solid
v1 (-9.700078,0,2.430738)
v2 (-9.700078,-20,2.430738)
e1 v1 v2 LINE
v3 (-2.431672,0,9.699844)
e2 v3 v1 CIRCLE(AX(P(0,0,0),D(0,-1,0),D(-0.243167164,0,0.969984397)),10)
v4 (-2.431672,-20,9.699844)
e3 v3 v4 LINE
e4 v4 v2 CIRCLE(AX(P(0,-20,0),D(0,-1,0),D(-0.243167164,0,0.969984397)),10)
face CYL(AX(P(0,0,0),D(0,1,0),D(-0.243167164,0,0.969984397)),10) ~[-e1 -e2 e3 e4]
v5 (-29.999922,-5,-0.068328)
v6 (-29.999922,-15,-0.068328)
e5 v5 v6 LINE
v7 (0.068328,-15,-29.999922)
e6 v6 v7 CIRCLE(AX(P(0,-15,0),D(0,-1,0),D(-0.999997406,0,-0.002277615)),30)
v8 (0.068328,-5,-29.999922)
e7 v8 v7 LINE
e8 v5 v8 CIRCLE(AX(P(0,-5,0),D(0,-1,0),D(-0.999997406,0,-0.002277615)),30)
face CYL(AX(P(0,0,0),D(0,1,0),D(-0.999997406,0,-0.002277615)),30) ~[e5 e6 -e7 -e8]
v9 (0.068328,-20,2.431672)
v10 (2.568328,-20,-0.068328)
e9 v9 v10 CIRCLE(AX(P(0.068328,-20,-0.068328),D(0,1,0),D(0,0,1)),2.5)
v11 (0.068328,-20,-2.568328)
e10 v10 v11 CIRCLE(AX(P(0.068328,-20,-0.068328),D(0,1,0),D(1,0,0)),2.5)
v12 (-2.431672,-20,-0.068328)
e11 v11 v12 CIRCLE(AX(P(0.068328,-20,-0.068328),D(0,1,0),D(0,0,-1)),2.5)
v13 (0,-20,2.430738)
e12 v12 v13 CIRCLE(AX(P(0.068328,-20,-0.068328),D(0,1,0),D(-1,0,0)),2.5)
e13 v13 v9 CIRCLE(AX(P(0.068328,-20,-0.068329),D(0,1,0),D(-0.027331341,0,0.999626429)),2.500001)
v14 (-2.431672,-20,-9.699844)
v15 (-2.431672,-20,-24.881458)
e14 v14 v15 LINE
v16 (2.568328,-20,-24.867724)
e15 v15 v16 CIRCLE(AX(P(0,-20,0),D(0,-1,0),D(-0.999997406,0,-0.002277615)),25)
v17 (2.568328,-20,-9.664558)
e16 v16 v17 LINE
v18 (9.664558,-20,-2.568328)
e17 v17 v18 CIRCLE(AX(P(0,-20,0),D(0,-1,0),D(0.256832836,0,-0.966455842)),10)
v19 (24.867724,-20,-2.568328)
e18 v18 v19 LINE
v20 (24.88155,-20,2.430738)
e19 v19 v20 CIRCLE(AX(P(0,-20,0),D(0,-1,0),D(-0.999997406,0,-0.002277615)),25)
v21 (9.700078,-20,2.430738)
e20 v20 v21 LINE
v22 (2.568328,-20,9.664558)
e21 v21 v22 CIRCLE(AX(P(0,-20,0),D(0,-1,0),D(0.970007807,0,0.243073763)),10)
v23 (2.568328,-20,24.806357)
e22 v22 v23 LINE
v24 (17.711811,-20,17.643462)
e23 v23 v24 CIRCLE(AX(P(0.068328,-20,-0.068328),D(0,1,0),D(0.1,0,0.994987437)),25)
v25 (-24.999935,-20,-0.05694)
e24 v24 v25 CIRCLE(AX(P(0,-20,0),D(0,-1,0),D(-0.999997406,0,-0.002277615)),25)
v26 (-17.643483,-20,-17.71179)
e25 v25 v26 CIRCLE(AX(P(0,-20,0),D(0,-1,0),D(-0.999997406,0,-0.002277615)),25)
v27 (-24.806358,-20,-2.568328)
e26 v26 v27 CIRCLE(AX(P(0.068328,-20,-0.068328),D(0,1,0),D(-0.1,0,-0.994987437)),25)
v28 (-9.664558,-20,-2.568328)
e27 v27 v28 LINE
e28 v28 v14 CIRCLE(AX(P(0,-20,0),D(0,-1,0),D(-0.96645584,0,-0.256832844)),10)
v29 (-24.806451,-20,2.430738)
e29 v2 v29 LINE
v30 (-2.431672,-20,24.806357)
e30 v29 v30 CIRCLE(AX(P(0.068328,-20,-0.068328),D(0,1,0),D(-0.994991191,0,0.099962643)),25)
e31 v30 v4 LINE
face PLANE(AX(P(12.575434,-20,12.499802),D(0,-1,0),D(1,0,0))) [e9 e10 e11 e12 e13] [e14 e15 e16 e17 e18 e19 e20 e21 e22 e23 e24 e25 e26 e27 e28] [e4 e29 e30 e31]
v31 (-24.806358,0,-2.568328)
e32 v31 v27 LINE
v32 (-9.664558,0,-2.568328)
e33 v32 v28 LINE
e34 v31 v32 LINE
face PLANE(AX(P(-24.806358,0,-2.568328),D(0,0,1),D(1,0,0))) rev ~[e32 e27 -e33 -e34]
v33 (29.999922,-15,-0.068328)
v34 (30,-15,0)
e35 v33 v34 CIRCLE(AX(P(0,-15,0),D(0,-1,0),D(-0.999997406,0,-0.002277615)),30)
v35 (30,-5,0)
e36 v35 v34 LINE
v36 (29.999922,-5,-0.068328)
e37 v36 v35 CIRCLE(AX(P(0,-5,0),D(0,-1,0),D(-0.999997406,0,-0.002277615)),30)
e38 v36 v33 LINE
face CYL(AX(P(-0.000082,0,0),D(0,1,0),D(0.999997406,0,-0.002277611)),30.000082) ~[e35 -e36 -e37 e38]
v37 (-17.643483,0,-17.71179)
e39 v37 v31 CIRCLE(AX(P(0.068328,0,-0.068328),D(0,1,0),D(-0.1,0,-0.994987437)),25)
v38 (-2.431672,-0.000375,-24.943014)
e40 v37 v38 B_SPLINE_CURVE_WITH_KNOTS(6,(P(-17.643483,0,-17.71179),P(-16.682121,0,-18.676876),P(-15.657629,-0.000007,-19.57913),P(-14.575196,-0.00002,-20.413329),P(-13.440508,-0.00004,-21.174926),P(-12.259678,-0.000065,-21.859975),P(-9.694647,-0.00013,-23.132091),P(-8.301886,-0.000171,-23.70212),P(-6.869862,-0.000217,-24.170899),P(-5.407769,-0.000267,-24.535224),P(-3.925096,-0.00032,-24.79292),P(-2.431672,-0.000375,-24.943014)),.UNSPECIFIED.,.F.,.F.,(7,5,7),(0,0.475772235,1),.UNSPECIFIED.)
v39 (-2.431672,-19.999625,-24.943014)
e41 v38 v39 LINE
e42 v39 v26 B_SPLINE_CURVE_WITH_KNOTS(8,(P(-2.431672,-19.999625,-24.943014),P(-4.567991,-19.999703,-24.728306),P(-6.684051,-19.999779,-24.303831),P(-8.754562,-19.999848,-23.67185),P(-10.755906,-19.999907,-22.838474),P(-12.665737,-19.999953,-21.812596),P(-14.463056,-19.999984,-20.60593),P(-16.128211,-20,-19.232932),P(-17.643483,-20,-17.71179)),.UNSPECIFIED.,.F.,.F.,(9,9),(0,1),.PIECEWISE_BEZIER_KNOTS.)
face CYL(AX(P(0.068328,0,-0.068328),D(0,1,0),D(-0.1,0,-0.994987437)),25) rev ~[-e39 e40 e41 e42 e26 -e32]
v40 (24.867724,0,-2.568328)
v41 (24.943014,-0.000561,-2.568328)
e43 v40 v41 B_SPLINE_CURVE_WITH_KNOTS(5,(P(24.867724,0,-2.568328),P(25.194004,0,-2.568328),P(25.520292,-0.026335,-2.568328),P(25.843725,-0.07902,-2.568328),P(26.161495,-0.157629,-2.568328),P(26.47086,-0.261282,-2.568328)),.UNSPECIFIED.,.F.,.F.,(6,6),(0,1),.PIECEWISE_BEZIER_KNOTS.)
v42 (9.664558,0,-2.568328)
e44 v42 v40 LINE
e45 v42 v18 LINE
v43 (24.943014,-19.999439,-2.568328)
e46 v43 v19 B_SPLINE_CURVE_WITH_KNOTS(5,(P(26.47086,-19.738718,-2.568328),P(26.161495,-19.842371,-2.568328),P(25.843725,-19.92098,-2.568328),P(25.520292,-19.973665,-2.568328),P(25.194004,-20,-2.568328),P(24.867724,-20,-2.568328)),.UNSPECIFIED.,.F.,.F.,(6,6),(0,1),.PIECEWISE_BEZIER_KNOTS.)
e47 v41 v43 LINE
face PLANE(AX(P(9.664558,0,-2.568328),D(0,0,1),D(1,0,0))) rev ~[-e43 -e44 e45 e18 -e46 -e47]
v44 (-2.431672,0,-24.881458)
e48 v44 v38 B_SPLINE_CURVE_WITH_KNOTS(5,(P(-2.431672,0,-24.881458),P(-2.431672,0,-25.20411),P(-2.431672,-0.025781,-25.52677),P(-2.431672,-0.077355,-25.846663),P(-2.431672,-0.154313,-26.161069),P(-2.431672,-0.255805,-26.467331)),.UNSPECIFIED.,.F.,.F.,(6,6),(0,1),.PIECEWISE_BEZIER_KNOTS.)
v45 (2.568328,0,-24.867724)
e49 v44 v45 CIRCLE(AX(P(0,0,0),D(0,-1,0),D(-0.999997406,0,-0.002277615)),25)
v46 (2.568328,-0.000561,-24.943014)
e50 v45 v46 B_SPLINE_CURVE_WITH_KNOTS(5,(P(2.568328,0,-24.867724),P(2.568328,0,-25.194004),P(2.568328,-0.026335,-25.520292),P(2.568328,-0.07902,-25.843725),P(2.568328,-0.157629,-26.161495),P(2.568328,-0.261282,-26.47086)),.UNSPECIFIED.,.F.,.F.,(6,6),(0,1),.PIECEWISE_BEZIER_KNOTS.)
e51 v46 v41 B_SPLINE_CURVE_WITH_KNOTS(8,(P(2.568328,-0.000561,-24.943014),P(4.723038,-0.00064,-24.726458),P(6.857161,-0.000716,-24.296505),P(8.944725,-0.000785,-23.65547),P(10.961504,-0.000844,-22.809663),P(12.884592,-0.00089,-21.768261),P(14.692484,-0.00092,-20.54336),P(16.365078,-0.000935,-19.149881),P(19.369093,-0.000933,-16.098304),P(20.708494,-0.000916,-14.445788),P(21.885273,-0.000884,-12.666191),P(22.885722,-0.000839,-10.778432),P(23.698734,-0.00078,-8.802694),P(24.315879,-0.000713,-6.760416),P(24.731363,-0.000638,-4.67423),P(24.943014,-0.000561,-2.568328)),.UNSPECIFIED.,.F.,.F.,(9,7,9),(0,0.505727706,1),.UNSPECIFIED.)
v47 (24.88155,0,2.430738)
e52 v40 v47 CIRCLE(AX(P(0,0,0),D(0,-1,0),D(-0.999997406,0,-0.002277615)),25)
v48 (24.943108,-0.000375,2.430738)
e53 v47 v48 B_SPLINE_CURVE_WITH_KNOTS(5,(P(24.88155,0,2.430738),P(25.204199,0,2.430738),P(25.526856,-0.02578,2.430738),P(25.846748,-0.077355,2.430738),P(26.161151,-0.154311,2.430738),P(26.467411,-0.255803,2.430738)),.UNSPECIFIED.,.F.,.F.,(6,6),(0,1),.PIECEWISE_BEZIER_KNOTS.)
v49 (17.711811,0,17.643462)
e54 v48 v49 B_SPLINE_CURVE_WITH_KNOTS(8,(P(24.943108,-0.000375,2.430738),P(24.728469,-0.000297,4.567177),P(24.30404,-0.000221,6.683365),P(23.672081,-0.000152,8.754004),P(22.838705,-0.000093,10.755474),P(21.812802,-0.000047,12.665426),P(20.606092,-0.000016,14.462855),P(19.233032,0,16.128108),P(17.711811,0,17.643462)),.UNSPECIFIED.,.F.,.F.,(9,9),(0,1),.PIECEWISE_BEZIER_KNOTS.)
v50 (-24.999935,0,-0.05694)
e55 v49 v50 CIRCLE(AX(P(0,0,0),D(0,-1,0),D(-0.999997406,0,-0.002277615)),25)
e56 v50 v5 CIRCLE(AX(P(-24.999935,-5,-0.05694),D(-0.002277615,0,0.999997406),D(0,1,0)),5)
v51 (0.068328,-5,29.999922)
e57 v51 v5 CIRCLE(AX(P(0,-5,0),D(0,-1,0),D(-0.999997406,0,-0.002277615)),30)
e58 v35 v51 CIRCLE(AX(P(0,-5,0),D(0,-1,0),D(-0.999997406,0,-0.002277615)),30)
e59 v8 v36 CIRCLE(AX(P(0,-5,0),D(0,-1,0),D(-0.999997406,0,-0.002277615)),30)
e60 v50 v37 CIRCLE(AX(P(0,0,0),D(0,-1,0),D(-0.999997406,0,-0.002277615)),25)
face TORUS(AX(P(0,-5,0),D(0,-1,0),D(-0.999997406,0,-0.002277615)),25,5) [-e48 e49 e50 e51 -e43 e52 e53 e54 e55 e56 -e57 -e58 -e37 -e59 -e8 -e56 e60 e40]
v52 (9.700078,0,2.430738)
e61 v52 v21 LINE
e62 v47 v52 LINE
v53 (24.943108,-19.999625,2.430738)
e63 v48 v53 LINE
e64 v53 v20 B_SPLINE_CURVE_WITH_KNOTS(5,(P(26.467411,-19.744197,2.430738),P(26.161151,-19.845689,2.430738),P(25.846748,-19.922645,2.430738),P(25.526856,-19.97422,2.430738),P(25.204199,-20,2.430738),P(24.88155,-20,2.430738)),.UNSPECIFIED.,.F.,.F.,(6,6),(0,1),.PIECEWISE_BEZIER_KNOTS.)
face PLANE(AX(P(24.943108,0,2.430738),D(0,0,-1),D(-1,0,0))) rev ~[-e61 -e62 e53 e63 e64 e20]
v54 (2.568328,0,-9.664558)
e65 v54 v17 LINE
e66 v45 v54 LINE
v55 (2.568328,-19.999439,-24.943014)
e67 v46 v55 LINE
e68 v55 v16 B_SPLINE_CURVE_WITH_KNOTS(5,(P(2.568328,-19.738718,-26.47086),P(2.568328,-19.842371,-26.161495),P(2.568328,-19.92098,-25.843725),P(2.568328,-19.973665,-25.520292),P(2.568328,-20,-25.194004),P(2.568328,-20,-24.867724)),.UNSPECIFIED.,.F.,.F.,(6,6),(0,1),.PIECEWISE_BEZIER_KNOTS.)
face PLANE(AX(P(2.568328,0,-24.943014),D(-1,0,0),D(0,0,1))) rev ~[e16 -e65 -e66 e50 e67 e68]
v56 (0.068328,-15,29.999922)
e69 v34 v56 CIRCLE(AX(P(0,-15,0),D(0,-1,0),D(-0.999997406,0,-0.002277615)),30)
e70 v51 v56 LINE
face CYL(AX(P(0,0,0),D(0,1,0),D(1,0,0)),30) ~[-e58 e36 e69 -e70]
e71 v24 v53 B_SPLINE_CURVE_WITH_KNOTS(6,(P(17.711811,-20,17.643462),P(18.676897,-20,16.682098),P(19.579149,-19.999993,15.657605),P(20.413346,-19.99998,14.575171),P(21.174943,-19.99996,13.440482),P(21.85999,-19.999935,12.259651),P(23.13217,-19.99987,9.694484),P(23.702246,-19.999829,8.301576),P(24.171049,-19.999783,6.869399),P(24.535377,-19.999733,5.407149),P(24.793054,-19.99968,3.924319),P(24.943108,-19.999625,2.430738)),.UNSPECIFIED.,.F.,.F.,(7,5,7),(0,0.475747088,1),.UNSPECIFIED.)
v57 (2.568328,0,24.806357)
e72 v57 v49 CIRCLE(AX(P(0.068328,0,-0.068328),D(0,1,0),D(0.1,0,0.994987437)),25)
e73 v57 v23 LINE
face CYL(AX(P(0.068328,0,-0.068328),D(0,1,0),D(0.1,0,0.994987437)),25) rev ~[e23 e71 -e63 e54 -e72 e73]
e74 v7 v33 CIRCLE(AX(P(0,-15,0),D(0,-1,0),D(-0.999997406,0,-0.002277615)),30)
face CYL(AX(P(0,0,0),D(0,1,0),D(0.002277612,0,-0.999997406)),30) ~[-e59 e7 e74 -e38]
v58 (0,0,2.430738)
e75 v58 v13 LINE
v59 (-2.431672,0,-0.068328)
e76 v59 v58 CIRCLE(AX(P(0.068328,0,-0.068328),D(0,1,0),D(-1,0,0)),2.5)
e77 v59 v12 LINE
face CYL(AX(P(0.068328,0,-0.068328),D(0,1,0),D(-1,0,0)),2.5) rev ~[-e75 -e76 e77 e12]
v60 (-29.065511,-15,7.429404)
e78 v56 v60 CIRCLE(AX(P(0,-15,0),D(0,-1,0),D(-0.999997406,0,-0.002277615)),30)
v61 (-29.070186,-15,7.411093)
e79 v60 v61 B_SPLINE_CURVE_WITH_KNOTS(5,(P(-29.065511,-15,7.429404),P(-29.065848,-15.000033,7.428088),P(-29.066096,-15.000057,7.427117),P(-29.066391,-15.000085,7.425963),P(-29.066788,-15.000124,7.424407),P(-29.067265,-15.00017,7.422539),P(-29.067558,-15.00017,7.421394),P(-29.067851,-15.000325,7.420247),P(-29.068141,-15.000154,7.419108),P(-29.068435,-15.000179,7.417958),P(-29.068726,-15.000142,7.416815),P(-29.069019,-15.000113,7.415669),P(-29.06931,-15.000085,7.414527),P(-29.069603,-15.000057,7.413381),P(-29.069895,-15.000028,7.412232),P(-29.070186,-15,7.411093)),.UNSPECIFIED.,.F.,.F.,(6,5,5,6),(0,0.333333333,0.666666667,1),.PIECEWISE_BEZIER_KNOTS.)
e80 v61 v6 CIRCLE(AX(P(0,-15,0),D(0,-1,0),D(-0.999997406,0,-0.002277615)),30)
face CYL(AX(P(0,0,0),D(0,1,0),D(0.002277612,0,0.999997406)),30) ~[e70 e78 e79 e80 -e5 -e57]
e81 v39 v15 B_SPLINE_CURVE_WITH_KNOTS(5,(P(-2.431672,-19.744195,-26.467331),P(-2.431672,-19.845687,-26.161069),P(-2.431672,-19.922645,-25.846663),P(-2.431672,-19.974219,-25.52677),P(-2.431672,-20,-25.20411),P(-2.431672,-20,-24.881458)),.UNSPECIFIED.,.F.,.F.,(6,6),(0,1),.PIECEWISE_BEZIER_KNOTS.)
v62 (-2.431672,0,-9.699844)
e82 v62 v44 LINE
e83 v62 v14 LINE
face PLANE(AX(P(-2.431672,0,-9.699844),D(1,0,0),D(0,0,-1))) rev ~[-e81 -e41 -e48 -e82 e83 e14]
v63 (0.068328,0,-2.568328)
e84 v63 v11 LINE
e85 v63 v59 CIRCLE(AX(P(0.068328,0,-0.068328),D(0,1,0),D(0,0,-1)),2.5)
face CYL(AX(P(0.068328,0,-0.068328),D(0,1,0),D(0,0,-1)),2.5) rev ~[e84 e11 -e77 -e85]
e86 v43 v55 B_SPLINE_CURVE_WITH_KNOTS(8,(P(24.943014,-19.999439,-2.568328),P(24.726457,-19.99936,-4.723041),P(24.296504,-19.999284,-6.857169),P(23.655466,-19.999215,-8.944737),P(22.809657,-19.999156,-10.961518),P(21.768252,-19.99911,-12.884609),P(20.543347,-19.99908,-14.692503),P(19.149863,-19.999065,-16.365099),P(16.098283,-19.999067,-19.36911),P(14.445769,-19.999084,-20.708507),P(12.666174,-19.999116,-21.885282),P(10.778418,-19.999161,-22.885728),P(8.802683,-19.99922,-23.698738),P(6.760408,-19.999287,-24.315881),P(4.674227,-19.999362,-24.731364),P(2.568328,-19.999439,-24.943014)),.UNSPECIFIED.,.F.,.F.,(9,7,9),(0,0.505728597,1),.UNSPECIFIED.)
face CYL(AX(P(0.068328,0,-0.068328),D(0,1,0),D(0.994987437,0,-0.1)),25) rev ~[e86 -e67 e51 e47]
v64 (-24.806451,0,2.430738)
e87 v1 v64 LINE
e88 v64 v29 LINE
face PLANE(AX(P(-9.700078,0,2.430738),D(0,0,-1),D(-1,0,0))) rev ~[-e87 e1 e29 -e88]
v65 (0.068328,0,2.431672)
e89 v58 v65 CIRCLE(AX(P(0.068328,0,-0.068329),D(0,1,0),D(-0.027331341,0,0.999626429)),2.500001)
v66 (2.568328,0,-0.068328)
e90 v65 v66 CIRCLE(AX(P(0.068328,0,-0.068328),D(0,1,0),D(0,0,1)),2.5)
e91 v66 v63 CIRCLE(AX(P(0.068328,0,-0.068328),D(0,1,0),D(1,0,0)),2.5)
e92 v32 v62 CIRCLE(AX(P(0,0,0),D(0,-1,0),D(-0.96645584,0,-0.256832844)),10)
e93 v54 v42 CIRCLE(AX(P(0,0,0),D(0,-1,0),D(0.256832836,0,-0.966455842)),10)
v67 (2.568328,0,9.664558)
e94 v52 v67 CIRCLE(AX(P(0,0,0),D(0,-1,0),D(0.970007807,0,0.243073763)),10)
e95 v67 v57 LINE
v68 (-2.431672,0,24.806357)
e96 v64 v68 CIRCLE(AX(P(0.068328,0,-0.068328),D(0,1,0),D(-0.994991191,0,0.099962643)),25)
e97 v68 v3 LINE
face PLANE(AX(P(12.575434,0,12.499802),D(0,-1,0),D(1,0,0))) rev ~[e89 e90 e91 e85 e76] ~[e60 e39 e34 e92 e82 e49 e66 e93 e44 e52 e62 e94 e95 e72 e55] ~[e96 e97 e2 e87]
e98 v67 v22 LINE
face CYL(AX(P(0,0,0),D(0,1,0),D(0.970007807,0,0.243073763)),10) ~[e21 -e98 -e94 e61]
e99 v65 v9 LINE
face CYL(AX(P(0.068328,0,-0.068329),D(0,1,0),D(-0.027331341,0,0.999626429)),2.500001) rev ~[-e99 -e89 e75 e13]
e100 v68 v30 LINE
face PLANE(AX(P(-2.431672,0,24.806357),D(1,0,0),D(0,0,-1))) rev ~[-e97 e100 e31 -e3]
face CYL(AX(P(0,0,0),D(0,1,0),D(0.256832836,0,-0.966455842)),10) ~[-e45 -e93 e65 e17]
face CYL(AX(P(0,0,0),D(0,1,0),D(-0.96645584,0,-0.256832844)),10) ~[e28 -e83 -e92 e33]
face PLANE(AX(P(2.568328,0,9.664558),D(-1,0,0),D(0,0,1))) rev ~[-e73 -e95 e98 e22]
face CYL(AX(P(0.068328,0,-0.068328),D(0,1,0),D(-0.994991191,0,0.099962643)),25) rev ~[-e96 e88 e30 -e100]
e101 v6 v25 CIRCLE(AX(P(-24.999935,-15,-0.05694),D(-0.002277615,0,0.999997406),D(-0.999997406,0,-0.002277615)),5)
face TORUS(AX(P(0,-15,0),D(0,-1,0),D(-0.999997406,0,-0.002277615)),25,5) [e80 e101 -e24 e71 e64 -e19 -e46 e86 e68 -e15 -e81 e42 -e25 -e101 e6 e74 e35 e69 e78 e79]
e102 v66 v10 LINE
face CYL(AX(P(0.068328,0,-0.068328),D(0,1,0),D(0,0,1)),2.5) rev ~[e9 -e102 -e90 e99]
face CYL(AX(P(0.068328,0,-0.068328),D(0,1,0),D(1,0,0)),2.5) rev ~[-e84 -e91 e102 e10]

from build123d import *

# Parameters (mm, degrees)
F1_DEPTH = 20


# Not quite as in the source:
# - a fillet or chamfer that OpenCascade refuses, or shapes differently, is made with other operations: its cross-section is extruded or revolved along the edge and cut away or added


with BuildPart() as f1:
    # F0 (on Front) → F1 (new body)
    with BuildSketch(Plane.XZ):
        with BuildLine():
            ThreePointArc((29.999922187, -0.0683284437), (29.9999805467, -0.034164244), (30, 0))
            ThreePointArc((30, 0), (21.2373474192, 21.189031941), (0.0683283603, 29.9999221872))
            Line((0.0683283603, 29.9999221872), (0.0683283603, 2.4316715563))
            ThreePointArc((0.0683283603, 2.4316715563), (1.8360953132, 1.6994385093), (2.5683283603, -0.0683284437))
            Line((2.5683283603, -0.0683284437), (29.999922187, -0.0683284437))
        make_face()
        with BuildLine():
            Line((24.9431081335, 2.4307376289), (9.7000780708, 2.4307376289))
            ThreePointArc((9.7000780708, 2.4307376289), (7.1211298187, 7.0206488379), (2.5683283603, 9.664558419))
            Line((2.5683283603, 9.664558419), (2.5683283603, 24.806357484))
            ThreePointArc((2.5683283603, 24.806357484), (17.7463297429, 17.6090092268), (24.9431081335, 2.4307376289))
        make_face(mode=Mode.SUBTRACT)
        with BuildLine():
            Line((0.0683283603, 2.4316715563), (0.0683283603, 29.9999221872))
            ThreePointArc((0.0683283603, 29.9999221872), (-21.2132034651, 21.2132034061), (-29.999922187, -0.0683284437))
            Line((-29.999922187, -0.0683284437), (-2.4316716397, -0.0683284437))
            ThreePointArc((-2.4316716397, -0.0683284437), (-1.7234334683, 1.675113425), (0, 2.4307376289))
            ThreePointArc((0, 2.4307376289), (0.034160989, 2.4314380635), (0.0683283603, 2.4316715563))
        make_face()
        with BuildLine():
            ThreePointArc((-24.8064514129, 2.4307376289), (-17.6096730223, 17.6090092268), (-2.4316716397, 24.806357484))
            Line((-2.4316716397, 24.806357484), (-2.4316716397, 9.6998439697))
            ThreePointArc((-2.4316716397, 9.6998439697), (-7.0714082408, 7.0707273665), (-9.7000780708, 2.4307376289))
            Line((-9.7000780708, 2.4307376289), (-24.8064514129, 2.4307376289))
        make_face(mode=Mode.SUBTRACT)
        with BuildLine():
            ThreePointArc((0.0683283603, -29.9999221872), (21.2132034061, -21.2132034651), (29.999922187, -0.0683284437))
            Line((29.999922187, -0.0683284437), (2.5683283603, -0.0683284437))
            ThreePointArc((2.5683283603, -0.0683284437), (1.8360953132, -1.8360953967), (0.0683283603, -2.5683284437))
            Line((0.0683283603, -2.5683284437), (0.0683283603, -29.9999221872))
        make_face()
        with BuildLine():
            ThreePointArc((24.9430142879, -2.5683284437), (17.7459978899, -17.7459979734), (2.5683283603, -24.9430143714))
            Line((2.5683283603, -24.9430143714), (2.5683283603, -9.664558419))
            ThreePointArc((2.5683283603, -9.664558419), (7.0710677813, -7.0710678424), (9.6645583968, -2.5683284437))
            Line((9.6645583968, -2.5683284437), (24.9430142879, -2.5683284437))
        make_face(mode=Mode.SUBTRACT)
        with BuildLine():
            Line((-2.4316716397, -0.0683284437), (-29.999922187, -0.0683284437))
            ThreePointArc((-29.999922187, -0.0683284437), (-21.1648329371, -21.2614638899), (0.0683283603, -29.9999221872))
            Line((0.0683283603, -29.9999221872), (0.0683283603, -2.5683284437))
            ThreePointArc((0.0683283603, -2.5683284437), (-1.6994385927, -1.8360953967), (-2.4316716397, -0.0683284437))
        make_face()
        with BuildLine():
            ThreePointArc((-2.4316716397, -24.9430143714), (-17.6093411694, -17.7459979734), (-24.8063575674, -2.5683284437))
            Line((-24.8063575674, -2.5683284437), (-9.6645583968, -2.5683284437))
            ThreePointArc((-9.6645583968, -2.5683284437), (-7.0209916464, -7.1207918311), (-2.4316716397, -9.6998439697))
            Line((-2.4316716397, -9.6998439697), (-2.4316716397, -24.9430143714))
        make_face(mode=Mode.SUBTRACT)
    extrude(amount=F1_DEPTH)

    # F2: fillet of radius 5 on 1 edges, made by hand

    # F2_s1 → F2_t2 (revolve, cut)
    with BuildSketch(Plane(origin=(0, 0, 0), x_dir=(0, 1, 0), z_dir=(-0.0022776148, 0, 0.9999974062))):
        with BuildLine():
            ThreePointArc((-15, 30), (-18.5355339059, 28.5355339059), (-20, 25))
            Line((-20, 25), (-20, 30))
            Line((-20, 30), (-15, 30))
        make_face()
    revolve(axis=Axis((0, -20, 0), (0, -1, 0)), mode=Mode.SUBTRACT)

    # F3: fillet of radius 5 on 1 edges, made by hand

    # F3_s1 → F3_t2 (revolve, cut)
    with BuildSketch(Plane(origin=(0, 0, 0), x_dir=(0, 1, 0), z_dir=(-0.0022776148, 0, 0.9999974062))):
        with BuildLine():
            ThreePointArc((0, 25), (-1.4644660941, 28.5355339059), (-5, 30))
            Line((-5, 30), (0, 30))
            Line((0, 30), (0, 25))
        make_face()
    revolve(axis=Axis((0, 0, 0), (0, -1, 0)), mode=Mode.SUBTRACT)


solid = f1.part
